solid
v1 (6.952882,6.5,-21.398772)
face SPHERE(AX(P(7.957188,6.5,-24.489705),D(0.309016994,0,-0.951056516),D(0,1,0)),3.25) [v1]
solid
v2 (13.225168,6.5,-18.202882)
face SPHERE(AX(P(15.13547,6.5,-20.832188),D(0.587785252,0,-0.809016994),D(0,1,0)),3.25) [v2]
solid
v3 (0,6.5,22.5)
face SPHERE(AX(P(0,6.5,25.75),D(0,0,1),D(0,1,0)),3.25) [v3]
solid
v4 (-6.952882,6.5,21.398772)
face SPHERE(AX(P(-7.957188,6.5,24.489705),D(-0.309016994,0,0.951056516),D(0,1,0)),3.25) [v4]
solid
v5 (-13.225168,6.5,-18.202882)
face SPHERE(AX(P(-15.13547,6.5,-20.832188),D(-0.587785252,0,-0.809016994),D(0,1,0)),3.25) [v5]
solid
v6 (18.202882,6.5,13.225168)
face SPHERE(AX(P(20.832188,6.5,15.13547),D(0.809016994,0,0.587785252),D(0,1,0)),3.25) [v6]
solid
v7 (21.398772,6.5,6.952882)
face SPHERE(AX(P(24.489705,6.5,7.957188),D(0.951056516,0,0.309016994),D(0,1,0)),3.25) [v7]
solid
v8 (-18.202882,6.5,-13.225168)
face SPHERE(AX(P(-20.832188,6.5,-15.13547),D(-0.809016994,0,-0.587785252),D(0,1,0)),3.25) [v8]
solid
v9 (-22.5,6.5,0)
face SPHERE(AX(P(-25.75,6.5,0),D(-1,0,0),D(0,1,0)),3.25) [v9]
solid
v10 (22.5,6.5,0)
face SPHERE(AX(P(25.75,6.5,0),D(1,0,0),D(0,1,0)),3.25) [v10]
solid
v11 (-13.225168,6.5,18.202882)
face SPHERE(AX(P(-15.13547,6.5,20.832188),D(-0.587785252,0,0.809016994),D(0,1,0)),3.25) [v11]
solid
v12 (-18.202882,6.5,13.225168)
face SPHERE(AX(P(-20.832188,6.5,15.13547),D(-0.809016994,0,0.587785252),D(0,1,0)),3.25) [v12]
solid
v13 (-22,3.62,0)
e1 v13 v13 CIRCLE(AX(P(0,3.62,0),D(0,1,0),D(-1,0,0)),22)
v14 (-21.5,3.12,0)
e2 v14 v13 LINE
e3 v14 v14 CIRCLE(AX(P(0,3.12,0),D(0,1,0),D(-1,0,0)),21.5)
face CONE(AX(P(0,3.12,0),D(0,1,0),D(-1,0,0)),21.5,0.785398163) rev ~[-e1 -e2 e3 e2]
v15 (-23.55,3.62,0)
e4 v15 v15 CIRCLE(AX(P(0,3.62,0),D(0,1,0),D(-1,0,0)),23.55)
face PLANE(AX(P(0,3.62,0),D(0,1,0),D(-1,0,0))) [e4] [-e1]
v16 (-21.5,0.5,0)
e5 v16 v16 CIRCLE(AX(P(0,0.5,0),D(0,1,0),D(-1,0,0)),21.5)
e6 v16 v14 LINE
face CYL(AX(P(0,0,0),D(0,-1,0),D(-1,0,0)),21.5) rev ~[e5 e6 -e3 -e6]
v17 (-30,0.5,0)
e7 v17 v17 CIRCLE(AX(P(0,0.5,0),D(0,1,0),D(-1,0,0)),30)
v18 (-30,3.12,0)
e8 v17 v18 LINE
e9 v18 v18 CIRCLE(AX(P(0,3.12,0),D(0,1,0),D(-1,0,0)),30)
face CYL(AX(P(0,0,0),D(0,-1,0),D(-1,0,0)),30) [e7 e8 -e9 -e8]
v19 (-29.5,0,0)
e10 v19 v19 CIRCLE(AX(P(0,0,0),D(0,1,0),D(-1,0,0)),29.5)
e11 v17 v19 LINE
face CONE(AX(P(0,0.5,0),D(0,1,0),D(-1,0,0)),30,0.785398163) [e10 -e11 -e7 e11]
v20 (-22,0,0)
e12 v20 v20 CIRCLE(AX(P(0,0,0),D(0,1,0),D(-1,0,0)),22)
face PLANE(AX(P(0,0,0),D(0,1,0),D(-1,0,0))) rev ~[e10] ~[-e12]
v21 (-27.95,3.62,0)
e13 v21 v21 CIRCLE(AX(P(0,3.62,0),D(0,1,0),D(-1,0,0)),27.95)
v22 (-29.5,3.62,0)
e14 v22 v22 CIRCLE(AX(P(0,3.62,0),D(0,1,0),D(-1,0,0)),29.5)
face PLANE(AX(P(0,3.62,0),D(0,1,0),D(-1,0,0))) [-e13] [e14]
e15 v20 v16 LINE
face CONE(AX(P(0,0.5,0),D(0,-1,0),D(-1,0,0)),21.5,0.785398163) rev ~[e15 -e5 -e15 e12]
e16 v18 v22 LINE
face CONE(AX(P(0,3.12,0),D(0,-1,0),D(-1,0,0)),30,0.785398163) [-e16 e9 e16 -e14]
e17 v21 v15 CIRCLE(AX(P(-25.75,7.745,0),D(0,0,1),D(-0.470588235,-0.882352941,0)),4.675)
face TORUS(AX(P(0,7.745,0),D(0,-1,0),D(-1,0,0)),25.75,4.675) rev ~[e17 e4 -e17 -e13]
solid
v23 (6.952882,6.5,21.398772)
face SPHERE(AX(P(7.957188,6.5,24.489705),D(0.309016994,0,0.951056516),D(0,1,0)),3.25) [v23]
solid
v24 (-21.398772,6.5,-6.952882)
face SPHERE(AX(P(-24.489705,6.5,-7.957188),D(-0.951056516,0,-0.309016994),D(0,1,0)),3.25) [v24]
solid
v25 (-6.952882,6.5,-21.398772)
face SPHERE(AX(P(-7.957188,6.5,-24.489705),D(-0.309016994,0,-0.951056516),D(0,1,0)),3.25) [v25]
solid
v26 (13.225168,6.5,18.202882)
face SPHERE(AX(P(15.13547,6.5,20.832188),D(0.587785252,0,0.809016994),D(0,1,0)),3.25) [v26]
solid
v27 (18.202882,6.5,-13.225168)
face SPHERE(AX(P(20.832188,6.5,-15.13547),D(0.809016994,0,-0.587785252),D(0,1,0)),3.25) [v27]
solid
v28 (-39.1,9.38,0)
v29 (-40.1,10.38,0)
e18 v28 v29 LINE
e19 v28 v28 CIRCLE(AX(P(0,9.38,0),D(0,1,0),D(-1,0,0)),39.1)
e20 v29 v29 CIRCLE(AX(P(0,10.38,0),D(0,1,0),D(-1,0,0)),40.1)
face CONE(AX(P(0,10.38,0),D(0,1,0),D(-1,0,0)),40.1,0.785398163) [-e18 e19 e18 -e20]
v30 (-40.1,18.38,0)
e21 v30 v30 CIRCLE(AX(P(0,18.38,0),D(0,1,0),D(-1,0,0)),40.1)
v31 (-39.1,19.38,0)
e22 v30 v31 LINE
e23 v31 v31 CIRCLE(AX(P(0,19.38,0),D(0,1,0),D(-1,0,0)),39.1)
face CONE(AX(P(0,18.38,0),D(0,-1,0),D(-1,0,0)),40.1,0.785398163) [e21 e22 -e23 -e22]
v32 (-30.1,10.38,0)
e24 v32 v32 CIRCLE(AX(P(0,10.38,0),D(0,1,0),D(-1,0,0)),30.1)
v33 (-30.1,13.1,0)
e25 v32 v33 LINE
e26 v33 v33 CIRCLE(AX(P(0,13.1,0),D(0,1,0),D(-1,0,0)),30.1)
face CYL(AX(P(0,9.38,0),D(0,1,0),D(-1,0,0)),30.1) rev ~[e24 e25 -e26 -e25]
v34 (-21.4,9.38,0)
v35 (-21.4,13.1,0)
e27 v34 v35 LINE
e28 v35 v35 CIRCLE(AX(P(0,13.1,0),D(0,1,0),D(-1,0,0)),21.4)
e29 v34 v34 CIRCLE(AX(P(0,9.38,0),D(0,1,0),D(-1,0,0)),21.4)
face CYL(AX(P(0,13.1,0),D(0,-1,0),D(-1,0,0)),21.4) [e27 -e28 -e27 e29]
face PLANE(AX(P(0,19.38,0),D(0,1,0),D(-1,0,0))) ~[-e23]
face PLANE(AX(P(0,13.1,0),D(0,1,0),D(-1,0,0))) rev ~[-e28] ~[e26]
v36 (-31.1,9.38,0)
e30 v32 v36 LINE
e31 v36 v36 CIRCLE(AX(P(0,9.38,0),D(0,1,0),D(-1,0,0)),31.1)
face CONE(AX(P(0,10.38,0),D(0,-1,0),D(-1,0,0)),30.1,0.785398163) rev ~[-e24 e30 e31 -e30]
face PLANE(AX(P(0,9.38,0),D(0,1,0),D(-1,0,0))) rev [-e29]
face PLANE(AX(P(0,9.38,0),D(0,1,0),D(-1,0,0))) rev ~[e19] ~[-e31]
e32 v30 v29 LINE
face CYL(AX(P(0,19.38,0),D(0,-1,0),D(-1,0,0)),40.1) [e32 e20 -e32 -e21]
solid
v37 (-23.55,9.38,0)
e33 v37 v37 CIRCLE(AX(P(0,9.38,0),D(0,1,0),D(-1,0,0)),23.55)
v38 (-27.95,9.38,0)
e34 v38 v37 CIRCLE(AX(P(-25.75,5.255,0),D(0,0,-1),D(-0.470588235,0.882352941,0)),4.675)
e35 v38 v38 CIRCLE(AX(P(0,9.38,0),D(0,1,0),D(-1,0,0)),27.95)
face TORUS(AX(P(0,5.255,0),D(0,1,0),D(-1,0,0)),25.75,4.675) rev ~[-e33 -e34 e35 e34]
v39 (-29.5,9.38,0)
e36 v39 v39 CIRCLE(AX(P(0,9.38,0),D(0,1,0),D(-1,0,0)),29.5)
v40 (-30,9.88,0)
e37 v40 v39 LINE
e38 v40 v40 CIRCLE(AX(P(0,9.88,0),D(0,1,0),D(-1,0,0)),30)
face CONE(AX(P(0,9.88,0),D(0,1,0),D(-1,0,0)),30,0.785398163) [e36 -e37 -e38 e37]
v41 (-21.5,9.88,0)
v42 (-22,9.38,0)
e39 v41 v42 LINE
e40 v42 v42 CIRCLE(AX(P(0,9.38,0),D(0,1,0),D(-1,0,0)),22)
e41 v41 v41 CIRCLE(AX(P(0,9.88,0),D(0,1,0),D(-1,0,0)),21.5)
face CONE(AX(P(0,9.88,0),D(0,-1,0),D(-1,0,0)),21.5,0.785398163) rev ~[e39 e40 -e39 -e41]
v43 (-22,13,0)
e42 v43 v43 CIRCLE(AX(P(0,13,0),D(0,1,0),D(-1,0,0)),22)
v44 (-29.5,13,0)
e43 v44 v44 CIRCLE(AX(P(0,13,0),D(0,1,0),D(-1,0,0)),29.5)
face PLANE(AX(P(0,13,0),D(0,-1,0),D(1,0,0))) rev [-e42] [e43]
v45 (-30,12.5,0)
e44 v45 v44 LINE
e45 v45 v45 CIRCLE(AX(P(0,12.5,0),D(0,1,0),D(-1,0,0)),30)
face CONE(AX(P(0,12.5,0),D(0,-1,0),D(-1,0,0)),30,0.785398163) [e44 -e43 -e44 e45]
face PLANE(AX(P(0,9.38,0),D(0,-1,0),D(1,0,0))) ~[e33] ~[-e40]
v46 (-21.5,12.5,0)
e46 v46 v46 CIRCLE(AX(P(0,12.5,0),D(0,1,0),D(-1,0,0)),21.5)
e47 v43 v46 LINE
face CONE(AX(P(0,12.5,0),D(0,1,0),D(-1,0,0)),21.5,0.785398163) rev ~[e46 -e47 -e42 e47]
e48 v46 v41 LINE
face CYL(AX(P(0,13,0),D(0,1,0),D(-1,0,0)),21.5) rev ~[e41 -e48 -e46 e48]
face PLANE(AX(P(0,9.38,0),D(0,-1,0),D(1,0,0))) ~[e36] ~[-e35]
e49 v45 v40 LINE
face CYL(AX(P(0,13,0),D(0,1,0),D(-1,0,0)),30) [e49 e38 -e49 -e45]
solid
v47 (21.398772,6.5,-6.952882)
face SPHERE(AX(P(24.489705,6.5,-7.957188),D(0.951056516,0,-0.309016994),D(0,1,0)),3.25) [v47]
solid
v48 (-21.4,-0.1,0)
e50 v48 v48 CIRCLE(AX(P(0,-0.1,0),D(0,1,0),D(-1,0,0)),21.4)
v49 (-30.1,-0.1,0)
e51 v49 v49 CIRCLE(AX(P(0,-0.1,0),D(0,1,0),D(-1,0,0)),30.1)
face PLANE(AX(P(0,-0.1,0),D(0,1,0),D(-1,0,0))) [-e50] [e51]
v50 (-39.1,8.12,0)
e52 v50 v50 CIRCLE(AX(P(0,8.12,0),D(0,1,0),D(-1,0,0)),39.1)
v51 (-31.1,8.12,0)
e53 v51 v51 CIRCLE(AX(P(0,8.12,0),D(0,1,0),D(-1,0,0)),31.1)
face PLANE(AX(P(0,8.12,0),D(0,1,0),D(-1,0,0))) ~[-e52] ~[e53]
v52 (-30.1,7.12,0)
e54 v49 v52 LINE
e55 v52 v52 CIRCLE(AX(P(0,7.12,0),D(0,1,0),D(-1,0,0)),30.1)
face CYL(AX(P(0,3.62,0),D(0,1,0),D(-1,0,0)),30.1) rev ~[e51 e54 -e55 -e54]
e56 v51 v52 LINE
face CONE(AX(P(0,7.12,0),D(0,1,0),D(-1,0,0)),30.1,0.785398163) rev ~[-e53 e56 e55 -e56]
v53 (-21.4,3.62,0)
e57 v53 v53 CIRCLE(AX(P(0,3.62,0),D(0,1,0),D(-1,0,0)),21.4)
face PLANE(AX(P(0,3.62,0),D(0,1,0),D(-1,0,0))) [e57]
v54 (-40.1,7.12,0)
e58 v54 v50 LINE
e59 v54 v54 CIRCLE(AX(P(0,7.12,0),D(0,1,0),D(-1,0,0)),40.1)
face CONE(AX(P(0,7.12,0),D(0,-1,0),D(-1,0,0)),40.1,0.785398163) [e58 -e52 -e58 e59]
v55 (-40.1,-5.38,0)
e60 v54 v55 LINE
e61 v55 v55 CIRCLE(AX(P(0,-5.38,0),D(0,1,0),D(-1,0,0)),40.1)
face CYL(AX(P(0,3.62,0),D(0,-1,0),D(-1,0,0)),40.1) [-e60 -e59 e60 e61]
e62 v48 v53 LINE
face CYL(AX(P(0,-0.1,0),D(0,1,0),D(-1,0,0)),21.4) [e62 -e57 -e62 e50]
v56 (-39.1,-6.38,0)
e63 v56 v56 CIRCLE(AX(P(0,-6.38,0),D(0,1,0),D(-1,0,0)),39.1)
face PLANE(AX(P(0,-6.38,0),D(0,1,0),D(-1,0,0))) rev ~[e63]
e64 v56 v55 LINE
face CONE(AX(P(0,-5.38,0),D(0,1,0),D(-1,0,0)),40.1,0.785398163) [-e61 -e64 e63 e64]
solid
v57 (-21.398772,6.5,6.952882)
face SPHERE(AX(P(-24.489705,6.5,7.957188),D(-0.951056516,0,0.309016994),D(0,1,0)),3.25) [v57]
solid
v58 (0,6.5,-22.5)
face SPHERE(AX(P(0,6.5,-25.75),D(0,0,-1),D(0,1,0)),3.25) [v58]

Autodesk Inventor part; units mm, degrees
ref_plane "YZ Plane" through (0, 0, 0) normal (1, 0, 0) x (0, 1, 0)
ref_plane "XZ Plane" through (0, 0, 0) normal (0, 1, 0) x (-1, 0, 0)
sketch "Sketch1" plane through (0, 0, 0) normal (0, 1, 0) x (-1, 0, 0)
  circle A0 centre (0, 0) radius 21.5
  circle A1 centre (0, 0) radius 30
  dimension "d0" = 43
  dimension "d1" = 60
extrude "Extrusion1" add sketch "Sketch1" along normal blind 3.62
sketch "Sketch2" plane through (0, 0, 0) normal (0, 0, 1) x (1, 0, 0)
  line L0 (-21.5, 3.62) -> (-21.5, 0) projected
  line L1 (-30, 0) -> (-30, 3.62) projected
  line L2 (-21.5, 3.62) -> (-21.5, 0) projected
  line L3 (-30, 3.62) -> (-21.5, 3.62)
  line L4 (30, 3.62) -> (-30, 3.62) projected
  line L5 (-30, 1.81) -> (-21.5, 1.81)
  line L6 (-27.95, -1.5592) -> (-23.55, -1.5592)
  line L7 (-23.55, -1.5592) -> (-23.55, 5.1792)
  line L8 (-23.55, 5.1792) -> (-27.95, 5.1792)
  line L9 (-27.95, 5.1792) -> (-27.95, -1.5592)
  line L10 (-27.95, -1.5592) -> (-23.55, 5.1792) construction
  line L11 (-23.55, -1.5592) -> (-27.95, 5.1792) construction
  line L12 (-25.75, 3.62) -> (-25.75, 3.07)
  arc A0 (-27.95, 3.62) -> (-23.55, 3.62) centre (-25.75, 7.745) ccw
  line L13 (0, 5.1792) -> (0, 7.4232)
  point P0 (0, 0)
  point P1 (-25.75, 1.81)
  dimension "d4" = 4.4
  dimension "d5" = 0.55
revolve "Revolution1" cut sketch "Sketch2" angle 360 about axis through (0, 5.1792, 0) along (0, 1, 0) contours A0 L12 L3 | L12 A0 L3
ref_plane "Work Plane2" through (0, 6.5, 0) normal (0, -1, 0) x (1, 0, 0)
ref_plane "Work Plane1" through (0, 13, 0) normal (0, -1, 0) x (1, 0, 0)
mirror "Mirror1" about plane through (0, 6.5, 0) normal (0, -1, 0)
sketch "Sketch3" plane through (0, 0, 0) normal (0, 0, 1) x (1, 0, 0)
  arc A0 (-25.75, 9.93) -> (-27.95, 9.38) centre (-25.75, 5.255) ccw projected
  arc A1 (-27.95, 3.62) -> (-25.75, 3.07) centre (-25.75, 7.745) ccw projected
  line L0 (-25.75, 7.745) -> (-25.75, 5.255)
  circle A2 centre (-25.75, 6.5) radius 3.25
  line L1 (-29, 6.5) -> (-22.5, 6.5)
  point P0 (0, 0)
  dimension "d8" = 6.5
revolve "Revolution2" add sketch "Sketch3" angle 360 about axis through (-29, 6.5, 0) along (1, 0, 0) separate body picked at (-27.8852, 6.7593) contours L1 A2
pattern_circular "Circular Pattern1" count 20 over 360 about axis through (0, 0, 0) along (0, 1, 0) of "Revolution2" bodies 2
chamfer "Chamfer1" distance 0.5 angle 45 8 edges at (30, 0, 0) (30, 3.62, 0) (21.5, 0, 0) (21.5, 3.62, 0) (21.5, 9.38, 0) (21.5, 13, 0) (30, 13, 0) (30, 9.38, 0)
sketch "Sketch4" plane through (0, 0, 0) normal (0, 0, 1) x (1, 0, 0)
  line L0 (-30, 12.5) -> (-29.5, 13) projected
  line L1 (-22, 13) -> (-21.5, 12.5) projected
  line L2 (-21.5, 12.5) -> (-21.5, 9.88) projected
  line L3 (-21.5, 9.88) -> (-22, 9.38) projected
  line L4 (-30, 9.88) -> (-30, 12.5) projected
  line L5 (-29.5, 9.38) -> (-30, 9.88) projected
  line L6 (-30, 3.12) -> (-29.5, 3.62) projected
  line L7 (-30, 0.5) -> (-30, 3.12) projected
  line L8 (-29.5, 0) -> (-30, 0.5) projected
  line L9 (-21.5, 0.5) -> (-22, 0) projected
  line L10 (-21.5, 3.12) -> (-21.5, 0.5) projected
  line L11 (-22, 3.62) -> (-21.5, 3.12) projected
  line L12 (-29.5, 13) -> (29.5, 13) projected
  line L13 (-29.5, 13) -> (-22, 13)
  line L14 (29.5, 0) -> (-29.5, 0) projected
  line L15 (-29.5, 0) -> (-22, 0)
  line L16 (29.5, 9.38) -> (-29.5, 9.38) projected
  line L17 (-29.5, 9.38) -> (-29.5, 3.62)
  line L18 (-22, 3.62) -> (-22, 9.38)
  line L19 (-29.5, 3.62) -> (29.5, 3.62) projected
  line L20 (0, -2.6) -> (0, 15.6) projected
  line L21 (-27.95, 3.62) -> (27.95, 3.62) projected
  line L22 (-25.88, 3.62) -> (-25.88, 6.5)
  point P0 (0, 0)
  dimension "d16" = 8.5
  dimension "d17" = 3.62
  dimension "d18" = 21.5
  dimension "d19" = 5.76
  dimension "d20" = 2.88
sketch "Skizze5" plane through (0, 0, 0) normal (0, 0, 1) x (1, 0, 0)
  line L0 (-30, 0.5) -> (-30, 3.12) construction
  line L1 (-29.5, 0) -> (-30, 0.5) construction
  line L2 (-21.5, 0.5) -> (-22, 0) construction
  line L3 (-21.5, 3.12) -> (-21.5, 0.5) construction
  line L4 (-22, 3.62) -> (-21.5, 3.12) construction
  line L5 (-30, 3.12) -> (-29.5, 3.62) construction
  line L6 (-29.5, 9.38) -> (-30, 9.88) construction
  line L7 (-30, 9.88) -> (-30, 12.5) construction
  line L8 (-30, 12.5) -> (-29.5, 13) construction
  line L9 (-22, 13) -> (-21.5, 12.5) construction
  line L10 (-21.5, 12.5) -> (-21.5, 9.88) construction
  line L11 (-21.5, 9.88) -> (-22, 9.38) construction
  line L12 (-29.5, 13) -> (29.5, 13) projected
  line L13 (-29.5, 13) -> (-22, 13) construction
  line L14 (30, 12.5) -> (-30, 12.5) projected
  line L15 (-29.5, 0) -> (-22, 0) construction
  line L16 (29.5, 0) -> (-29.5, 0) projected
  line L17 (-21.5, 3.62) -> (-21.5, 0) construction
  line L18 (-21.5, 0) -> (-30, 0) construction
  line L19 (-30, 0) -> (-30, 3.62) construction
  line L20 (-30.1, 3.62) -> (-30.1, -0.1)
  line L21 (-30.1, -0.1) -> (-21.4, -0.1)
  line L22 (-21.4, -0.1) -> (-21.4, 3.62)
  line L23 (-21.4, 3.62) -> (0, 3.62)
  line L24 (-27.95, 3.62) -> (27.95, 3.62) projected
  line L25 (-40.1, 3.62) -> (-40.1, -6.38)
  line L26 (-40.1, -6.38) -> (0, -6.38)
  line L27 (-40.1, -6.38) -> (0, -6.38) construction
  line L28 (0, -6.38) -> (0, 3.62)
  line L29 (23.55, 9.38) -> (-23.55, 9.38) projected
  line L30 (-30, 13) -> (-21.5, 13) construction
  line L31 (-21.5, 13) -> (-21.5, 9.38) construction
  line L32 (-30, 9.38) -> (-30, 13) construction
  line L33 (-30.1, 9.38) -> (-30.1, 13.1)
  line L34 (-30.1, 13.1) -> (-21.4, 13.1)
  line L35 (-21.4, 13.1) -> (-21.4, 9.38)
  line L36 (-30.1, 3.62) -> (-30.1, 8.12)
  line L37 (-30.1, 8.12) -> (-40.1, 8.12)
  line L38 (-40.1, 8.12) -> (-40.1, 3.62)
  line L39 (-21.4, 9.38) -> (0, 9.38)
  line L40 (-21.4, 9.38) -> (0, 9.38) construction
  line L41 (0, 9.38) -> (0, 19.38)
  line L42 (0, 19.38) -> (-40.1, 19.38)
  line L43 (0, 19.38) -> (40.1, 19.38) construction
  line L44 (-40.1, 19.38) -> (-40.1, 9.38)
  line L45 (-40.1, 9.38) -> (-30.1, 9.38)
  point P0 (0, 0)
  dimension "d21" = 0.1
  dimension "d22" = 10
  dimension "d23" = 10
  dimension "d24" = 0
  dimension "d25" = 0.1
  dimension "d26" = 10
  dimension "d27" = 4.5
  dimension "d28" = 0
  dimension "d29" = 10
  dimension "d30" = 180
revolve "Umdrehung3" add sketch "Skizze5" angle 360 about axis through (0, -6.38, 0) along (0, 1, 0) separate body contours L28 L26 L25 L38 L37 L36 L20 L21 L22 L16 | L16 L22 L23 L28
revolve "Umdrehung4" add sketch "Skizze5" angle 360 about axis through (0, 9.38, 0) along (0, 1, 0) separate body contours L35 L34 L33 L45 L44 L42 L41 L12 | L12 L41 L14 L35 | L14 L41 L29 L35
chamfer "Fasen2" distance 1 angle 45 3 edges at (30.1, 8.12, 0) (40.1, 8.12, 0) (40.1, -6.38, 0)
chamfer "Fasen3" distance 1 angle 45 3 edges at (30.1, 9.38, 0) (40.1, 9.38, 0) (40.1, 19.38, 0)
properties part number "Bearing"
